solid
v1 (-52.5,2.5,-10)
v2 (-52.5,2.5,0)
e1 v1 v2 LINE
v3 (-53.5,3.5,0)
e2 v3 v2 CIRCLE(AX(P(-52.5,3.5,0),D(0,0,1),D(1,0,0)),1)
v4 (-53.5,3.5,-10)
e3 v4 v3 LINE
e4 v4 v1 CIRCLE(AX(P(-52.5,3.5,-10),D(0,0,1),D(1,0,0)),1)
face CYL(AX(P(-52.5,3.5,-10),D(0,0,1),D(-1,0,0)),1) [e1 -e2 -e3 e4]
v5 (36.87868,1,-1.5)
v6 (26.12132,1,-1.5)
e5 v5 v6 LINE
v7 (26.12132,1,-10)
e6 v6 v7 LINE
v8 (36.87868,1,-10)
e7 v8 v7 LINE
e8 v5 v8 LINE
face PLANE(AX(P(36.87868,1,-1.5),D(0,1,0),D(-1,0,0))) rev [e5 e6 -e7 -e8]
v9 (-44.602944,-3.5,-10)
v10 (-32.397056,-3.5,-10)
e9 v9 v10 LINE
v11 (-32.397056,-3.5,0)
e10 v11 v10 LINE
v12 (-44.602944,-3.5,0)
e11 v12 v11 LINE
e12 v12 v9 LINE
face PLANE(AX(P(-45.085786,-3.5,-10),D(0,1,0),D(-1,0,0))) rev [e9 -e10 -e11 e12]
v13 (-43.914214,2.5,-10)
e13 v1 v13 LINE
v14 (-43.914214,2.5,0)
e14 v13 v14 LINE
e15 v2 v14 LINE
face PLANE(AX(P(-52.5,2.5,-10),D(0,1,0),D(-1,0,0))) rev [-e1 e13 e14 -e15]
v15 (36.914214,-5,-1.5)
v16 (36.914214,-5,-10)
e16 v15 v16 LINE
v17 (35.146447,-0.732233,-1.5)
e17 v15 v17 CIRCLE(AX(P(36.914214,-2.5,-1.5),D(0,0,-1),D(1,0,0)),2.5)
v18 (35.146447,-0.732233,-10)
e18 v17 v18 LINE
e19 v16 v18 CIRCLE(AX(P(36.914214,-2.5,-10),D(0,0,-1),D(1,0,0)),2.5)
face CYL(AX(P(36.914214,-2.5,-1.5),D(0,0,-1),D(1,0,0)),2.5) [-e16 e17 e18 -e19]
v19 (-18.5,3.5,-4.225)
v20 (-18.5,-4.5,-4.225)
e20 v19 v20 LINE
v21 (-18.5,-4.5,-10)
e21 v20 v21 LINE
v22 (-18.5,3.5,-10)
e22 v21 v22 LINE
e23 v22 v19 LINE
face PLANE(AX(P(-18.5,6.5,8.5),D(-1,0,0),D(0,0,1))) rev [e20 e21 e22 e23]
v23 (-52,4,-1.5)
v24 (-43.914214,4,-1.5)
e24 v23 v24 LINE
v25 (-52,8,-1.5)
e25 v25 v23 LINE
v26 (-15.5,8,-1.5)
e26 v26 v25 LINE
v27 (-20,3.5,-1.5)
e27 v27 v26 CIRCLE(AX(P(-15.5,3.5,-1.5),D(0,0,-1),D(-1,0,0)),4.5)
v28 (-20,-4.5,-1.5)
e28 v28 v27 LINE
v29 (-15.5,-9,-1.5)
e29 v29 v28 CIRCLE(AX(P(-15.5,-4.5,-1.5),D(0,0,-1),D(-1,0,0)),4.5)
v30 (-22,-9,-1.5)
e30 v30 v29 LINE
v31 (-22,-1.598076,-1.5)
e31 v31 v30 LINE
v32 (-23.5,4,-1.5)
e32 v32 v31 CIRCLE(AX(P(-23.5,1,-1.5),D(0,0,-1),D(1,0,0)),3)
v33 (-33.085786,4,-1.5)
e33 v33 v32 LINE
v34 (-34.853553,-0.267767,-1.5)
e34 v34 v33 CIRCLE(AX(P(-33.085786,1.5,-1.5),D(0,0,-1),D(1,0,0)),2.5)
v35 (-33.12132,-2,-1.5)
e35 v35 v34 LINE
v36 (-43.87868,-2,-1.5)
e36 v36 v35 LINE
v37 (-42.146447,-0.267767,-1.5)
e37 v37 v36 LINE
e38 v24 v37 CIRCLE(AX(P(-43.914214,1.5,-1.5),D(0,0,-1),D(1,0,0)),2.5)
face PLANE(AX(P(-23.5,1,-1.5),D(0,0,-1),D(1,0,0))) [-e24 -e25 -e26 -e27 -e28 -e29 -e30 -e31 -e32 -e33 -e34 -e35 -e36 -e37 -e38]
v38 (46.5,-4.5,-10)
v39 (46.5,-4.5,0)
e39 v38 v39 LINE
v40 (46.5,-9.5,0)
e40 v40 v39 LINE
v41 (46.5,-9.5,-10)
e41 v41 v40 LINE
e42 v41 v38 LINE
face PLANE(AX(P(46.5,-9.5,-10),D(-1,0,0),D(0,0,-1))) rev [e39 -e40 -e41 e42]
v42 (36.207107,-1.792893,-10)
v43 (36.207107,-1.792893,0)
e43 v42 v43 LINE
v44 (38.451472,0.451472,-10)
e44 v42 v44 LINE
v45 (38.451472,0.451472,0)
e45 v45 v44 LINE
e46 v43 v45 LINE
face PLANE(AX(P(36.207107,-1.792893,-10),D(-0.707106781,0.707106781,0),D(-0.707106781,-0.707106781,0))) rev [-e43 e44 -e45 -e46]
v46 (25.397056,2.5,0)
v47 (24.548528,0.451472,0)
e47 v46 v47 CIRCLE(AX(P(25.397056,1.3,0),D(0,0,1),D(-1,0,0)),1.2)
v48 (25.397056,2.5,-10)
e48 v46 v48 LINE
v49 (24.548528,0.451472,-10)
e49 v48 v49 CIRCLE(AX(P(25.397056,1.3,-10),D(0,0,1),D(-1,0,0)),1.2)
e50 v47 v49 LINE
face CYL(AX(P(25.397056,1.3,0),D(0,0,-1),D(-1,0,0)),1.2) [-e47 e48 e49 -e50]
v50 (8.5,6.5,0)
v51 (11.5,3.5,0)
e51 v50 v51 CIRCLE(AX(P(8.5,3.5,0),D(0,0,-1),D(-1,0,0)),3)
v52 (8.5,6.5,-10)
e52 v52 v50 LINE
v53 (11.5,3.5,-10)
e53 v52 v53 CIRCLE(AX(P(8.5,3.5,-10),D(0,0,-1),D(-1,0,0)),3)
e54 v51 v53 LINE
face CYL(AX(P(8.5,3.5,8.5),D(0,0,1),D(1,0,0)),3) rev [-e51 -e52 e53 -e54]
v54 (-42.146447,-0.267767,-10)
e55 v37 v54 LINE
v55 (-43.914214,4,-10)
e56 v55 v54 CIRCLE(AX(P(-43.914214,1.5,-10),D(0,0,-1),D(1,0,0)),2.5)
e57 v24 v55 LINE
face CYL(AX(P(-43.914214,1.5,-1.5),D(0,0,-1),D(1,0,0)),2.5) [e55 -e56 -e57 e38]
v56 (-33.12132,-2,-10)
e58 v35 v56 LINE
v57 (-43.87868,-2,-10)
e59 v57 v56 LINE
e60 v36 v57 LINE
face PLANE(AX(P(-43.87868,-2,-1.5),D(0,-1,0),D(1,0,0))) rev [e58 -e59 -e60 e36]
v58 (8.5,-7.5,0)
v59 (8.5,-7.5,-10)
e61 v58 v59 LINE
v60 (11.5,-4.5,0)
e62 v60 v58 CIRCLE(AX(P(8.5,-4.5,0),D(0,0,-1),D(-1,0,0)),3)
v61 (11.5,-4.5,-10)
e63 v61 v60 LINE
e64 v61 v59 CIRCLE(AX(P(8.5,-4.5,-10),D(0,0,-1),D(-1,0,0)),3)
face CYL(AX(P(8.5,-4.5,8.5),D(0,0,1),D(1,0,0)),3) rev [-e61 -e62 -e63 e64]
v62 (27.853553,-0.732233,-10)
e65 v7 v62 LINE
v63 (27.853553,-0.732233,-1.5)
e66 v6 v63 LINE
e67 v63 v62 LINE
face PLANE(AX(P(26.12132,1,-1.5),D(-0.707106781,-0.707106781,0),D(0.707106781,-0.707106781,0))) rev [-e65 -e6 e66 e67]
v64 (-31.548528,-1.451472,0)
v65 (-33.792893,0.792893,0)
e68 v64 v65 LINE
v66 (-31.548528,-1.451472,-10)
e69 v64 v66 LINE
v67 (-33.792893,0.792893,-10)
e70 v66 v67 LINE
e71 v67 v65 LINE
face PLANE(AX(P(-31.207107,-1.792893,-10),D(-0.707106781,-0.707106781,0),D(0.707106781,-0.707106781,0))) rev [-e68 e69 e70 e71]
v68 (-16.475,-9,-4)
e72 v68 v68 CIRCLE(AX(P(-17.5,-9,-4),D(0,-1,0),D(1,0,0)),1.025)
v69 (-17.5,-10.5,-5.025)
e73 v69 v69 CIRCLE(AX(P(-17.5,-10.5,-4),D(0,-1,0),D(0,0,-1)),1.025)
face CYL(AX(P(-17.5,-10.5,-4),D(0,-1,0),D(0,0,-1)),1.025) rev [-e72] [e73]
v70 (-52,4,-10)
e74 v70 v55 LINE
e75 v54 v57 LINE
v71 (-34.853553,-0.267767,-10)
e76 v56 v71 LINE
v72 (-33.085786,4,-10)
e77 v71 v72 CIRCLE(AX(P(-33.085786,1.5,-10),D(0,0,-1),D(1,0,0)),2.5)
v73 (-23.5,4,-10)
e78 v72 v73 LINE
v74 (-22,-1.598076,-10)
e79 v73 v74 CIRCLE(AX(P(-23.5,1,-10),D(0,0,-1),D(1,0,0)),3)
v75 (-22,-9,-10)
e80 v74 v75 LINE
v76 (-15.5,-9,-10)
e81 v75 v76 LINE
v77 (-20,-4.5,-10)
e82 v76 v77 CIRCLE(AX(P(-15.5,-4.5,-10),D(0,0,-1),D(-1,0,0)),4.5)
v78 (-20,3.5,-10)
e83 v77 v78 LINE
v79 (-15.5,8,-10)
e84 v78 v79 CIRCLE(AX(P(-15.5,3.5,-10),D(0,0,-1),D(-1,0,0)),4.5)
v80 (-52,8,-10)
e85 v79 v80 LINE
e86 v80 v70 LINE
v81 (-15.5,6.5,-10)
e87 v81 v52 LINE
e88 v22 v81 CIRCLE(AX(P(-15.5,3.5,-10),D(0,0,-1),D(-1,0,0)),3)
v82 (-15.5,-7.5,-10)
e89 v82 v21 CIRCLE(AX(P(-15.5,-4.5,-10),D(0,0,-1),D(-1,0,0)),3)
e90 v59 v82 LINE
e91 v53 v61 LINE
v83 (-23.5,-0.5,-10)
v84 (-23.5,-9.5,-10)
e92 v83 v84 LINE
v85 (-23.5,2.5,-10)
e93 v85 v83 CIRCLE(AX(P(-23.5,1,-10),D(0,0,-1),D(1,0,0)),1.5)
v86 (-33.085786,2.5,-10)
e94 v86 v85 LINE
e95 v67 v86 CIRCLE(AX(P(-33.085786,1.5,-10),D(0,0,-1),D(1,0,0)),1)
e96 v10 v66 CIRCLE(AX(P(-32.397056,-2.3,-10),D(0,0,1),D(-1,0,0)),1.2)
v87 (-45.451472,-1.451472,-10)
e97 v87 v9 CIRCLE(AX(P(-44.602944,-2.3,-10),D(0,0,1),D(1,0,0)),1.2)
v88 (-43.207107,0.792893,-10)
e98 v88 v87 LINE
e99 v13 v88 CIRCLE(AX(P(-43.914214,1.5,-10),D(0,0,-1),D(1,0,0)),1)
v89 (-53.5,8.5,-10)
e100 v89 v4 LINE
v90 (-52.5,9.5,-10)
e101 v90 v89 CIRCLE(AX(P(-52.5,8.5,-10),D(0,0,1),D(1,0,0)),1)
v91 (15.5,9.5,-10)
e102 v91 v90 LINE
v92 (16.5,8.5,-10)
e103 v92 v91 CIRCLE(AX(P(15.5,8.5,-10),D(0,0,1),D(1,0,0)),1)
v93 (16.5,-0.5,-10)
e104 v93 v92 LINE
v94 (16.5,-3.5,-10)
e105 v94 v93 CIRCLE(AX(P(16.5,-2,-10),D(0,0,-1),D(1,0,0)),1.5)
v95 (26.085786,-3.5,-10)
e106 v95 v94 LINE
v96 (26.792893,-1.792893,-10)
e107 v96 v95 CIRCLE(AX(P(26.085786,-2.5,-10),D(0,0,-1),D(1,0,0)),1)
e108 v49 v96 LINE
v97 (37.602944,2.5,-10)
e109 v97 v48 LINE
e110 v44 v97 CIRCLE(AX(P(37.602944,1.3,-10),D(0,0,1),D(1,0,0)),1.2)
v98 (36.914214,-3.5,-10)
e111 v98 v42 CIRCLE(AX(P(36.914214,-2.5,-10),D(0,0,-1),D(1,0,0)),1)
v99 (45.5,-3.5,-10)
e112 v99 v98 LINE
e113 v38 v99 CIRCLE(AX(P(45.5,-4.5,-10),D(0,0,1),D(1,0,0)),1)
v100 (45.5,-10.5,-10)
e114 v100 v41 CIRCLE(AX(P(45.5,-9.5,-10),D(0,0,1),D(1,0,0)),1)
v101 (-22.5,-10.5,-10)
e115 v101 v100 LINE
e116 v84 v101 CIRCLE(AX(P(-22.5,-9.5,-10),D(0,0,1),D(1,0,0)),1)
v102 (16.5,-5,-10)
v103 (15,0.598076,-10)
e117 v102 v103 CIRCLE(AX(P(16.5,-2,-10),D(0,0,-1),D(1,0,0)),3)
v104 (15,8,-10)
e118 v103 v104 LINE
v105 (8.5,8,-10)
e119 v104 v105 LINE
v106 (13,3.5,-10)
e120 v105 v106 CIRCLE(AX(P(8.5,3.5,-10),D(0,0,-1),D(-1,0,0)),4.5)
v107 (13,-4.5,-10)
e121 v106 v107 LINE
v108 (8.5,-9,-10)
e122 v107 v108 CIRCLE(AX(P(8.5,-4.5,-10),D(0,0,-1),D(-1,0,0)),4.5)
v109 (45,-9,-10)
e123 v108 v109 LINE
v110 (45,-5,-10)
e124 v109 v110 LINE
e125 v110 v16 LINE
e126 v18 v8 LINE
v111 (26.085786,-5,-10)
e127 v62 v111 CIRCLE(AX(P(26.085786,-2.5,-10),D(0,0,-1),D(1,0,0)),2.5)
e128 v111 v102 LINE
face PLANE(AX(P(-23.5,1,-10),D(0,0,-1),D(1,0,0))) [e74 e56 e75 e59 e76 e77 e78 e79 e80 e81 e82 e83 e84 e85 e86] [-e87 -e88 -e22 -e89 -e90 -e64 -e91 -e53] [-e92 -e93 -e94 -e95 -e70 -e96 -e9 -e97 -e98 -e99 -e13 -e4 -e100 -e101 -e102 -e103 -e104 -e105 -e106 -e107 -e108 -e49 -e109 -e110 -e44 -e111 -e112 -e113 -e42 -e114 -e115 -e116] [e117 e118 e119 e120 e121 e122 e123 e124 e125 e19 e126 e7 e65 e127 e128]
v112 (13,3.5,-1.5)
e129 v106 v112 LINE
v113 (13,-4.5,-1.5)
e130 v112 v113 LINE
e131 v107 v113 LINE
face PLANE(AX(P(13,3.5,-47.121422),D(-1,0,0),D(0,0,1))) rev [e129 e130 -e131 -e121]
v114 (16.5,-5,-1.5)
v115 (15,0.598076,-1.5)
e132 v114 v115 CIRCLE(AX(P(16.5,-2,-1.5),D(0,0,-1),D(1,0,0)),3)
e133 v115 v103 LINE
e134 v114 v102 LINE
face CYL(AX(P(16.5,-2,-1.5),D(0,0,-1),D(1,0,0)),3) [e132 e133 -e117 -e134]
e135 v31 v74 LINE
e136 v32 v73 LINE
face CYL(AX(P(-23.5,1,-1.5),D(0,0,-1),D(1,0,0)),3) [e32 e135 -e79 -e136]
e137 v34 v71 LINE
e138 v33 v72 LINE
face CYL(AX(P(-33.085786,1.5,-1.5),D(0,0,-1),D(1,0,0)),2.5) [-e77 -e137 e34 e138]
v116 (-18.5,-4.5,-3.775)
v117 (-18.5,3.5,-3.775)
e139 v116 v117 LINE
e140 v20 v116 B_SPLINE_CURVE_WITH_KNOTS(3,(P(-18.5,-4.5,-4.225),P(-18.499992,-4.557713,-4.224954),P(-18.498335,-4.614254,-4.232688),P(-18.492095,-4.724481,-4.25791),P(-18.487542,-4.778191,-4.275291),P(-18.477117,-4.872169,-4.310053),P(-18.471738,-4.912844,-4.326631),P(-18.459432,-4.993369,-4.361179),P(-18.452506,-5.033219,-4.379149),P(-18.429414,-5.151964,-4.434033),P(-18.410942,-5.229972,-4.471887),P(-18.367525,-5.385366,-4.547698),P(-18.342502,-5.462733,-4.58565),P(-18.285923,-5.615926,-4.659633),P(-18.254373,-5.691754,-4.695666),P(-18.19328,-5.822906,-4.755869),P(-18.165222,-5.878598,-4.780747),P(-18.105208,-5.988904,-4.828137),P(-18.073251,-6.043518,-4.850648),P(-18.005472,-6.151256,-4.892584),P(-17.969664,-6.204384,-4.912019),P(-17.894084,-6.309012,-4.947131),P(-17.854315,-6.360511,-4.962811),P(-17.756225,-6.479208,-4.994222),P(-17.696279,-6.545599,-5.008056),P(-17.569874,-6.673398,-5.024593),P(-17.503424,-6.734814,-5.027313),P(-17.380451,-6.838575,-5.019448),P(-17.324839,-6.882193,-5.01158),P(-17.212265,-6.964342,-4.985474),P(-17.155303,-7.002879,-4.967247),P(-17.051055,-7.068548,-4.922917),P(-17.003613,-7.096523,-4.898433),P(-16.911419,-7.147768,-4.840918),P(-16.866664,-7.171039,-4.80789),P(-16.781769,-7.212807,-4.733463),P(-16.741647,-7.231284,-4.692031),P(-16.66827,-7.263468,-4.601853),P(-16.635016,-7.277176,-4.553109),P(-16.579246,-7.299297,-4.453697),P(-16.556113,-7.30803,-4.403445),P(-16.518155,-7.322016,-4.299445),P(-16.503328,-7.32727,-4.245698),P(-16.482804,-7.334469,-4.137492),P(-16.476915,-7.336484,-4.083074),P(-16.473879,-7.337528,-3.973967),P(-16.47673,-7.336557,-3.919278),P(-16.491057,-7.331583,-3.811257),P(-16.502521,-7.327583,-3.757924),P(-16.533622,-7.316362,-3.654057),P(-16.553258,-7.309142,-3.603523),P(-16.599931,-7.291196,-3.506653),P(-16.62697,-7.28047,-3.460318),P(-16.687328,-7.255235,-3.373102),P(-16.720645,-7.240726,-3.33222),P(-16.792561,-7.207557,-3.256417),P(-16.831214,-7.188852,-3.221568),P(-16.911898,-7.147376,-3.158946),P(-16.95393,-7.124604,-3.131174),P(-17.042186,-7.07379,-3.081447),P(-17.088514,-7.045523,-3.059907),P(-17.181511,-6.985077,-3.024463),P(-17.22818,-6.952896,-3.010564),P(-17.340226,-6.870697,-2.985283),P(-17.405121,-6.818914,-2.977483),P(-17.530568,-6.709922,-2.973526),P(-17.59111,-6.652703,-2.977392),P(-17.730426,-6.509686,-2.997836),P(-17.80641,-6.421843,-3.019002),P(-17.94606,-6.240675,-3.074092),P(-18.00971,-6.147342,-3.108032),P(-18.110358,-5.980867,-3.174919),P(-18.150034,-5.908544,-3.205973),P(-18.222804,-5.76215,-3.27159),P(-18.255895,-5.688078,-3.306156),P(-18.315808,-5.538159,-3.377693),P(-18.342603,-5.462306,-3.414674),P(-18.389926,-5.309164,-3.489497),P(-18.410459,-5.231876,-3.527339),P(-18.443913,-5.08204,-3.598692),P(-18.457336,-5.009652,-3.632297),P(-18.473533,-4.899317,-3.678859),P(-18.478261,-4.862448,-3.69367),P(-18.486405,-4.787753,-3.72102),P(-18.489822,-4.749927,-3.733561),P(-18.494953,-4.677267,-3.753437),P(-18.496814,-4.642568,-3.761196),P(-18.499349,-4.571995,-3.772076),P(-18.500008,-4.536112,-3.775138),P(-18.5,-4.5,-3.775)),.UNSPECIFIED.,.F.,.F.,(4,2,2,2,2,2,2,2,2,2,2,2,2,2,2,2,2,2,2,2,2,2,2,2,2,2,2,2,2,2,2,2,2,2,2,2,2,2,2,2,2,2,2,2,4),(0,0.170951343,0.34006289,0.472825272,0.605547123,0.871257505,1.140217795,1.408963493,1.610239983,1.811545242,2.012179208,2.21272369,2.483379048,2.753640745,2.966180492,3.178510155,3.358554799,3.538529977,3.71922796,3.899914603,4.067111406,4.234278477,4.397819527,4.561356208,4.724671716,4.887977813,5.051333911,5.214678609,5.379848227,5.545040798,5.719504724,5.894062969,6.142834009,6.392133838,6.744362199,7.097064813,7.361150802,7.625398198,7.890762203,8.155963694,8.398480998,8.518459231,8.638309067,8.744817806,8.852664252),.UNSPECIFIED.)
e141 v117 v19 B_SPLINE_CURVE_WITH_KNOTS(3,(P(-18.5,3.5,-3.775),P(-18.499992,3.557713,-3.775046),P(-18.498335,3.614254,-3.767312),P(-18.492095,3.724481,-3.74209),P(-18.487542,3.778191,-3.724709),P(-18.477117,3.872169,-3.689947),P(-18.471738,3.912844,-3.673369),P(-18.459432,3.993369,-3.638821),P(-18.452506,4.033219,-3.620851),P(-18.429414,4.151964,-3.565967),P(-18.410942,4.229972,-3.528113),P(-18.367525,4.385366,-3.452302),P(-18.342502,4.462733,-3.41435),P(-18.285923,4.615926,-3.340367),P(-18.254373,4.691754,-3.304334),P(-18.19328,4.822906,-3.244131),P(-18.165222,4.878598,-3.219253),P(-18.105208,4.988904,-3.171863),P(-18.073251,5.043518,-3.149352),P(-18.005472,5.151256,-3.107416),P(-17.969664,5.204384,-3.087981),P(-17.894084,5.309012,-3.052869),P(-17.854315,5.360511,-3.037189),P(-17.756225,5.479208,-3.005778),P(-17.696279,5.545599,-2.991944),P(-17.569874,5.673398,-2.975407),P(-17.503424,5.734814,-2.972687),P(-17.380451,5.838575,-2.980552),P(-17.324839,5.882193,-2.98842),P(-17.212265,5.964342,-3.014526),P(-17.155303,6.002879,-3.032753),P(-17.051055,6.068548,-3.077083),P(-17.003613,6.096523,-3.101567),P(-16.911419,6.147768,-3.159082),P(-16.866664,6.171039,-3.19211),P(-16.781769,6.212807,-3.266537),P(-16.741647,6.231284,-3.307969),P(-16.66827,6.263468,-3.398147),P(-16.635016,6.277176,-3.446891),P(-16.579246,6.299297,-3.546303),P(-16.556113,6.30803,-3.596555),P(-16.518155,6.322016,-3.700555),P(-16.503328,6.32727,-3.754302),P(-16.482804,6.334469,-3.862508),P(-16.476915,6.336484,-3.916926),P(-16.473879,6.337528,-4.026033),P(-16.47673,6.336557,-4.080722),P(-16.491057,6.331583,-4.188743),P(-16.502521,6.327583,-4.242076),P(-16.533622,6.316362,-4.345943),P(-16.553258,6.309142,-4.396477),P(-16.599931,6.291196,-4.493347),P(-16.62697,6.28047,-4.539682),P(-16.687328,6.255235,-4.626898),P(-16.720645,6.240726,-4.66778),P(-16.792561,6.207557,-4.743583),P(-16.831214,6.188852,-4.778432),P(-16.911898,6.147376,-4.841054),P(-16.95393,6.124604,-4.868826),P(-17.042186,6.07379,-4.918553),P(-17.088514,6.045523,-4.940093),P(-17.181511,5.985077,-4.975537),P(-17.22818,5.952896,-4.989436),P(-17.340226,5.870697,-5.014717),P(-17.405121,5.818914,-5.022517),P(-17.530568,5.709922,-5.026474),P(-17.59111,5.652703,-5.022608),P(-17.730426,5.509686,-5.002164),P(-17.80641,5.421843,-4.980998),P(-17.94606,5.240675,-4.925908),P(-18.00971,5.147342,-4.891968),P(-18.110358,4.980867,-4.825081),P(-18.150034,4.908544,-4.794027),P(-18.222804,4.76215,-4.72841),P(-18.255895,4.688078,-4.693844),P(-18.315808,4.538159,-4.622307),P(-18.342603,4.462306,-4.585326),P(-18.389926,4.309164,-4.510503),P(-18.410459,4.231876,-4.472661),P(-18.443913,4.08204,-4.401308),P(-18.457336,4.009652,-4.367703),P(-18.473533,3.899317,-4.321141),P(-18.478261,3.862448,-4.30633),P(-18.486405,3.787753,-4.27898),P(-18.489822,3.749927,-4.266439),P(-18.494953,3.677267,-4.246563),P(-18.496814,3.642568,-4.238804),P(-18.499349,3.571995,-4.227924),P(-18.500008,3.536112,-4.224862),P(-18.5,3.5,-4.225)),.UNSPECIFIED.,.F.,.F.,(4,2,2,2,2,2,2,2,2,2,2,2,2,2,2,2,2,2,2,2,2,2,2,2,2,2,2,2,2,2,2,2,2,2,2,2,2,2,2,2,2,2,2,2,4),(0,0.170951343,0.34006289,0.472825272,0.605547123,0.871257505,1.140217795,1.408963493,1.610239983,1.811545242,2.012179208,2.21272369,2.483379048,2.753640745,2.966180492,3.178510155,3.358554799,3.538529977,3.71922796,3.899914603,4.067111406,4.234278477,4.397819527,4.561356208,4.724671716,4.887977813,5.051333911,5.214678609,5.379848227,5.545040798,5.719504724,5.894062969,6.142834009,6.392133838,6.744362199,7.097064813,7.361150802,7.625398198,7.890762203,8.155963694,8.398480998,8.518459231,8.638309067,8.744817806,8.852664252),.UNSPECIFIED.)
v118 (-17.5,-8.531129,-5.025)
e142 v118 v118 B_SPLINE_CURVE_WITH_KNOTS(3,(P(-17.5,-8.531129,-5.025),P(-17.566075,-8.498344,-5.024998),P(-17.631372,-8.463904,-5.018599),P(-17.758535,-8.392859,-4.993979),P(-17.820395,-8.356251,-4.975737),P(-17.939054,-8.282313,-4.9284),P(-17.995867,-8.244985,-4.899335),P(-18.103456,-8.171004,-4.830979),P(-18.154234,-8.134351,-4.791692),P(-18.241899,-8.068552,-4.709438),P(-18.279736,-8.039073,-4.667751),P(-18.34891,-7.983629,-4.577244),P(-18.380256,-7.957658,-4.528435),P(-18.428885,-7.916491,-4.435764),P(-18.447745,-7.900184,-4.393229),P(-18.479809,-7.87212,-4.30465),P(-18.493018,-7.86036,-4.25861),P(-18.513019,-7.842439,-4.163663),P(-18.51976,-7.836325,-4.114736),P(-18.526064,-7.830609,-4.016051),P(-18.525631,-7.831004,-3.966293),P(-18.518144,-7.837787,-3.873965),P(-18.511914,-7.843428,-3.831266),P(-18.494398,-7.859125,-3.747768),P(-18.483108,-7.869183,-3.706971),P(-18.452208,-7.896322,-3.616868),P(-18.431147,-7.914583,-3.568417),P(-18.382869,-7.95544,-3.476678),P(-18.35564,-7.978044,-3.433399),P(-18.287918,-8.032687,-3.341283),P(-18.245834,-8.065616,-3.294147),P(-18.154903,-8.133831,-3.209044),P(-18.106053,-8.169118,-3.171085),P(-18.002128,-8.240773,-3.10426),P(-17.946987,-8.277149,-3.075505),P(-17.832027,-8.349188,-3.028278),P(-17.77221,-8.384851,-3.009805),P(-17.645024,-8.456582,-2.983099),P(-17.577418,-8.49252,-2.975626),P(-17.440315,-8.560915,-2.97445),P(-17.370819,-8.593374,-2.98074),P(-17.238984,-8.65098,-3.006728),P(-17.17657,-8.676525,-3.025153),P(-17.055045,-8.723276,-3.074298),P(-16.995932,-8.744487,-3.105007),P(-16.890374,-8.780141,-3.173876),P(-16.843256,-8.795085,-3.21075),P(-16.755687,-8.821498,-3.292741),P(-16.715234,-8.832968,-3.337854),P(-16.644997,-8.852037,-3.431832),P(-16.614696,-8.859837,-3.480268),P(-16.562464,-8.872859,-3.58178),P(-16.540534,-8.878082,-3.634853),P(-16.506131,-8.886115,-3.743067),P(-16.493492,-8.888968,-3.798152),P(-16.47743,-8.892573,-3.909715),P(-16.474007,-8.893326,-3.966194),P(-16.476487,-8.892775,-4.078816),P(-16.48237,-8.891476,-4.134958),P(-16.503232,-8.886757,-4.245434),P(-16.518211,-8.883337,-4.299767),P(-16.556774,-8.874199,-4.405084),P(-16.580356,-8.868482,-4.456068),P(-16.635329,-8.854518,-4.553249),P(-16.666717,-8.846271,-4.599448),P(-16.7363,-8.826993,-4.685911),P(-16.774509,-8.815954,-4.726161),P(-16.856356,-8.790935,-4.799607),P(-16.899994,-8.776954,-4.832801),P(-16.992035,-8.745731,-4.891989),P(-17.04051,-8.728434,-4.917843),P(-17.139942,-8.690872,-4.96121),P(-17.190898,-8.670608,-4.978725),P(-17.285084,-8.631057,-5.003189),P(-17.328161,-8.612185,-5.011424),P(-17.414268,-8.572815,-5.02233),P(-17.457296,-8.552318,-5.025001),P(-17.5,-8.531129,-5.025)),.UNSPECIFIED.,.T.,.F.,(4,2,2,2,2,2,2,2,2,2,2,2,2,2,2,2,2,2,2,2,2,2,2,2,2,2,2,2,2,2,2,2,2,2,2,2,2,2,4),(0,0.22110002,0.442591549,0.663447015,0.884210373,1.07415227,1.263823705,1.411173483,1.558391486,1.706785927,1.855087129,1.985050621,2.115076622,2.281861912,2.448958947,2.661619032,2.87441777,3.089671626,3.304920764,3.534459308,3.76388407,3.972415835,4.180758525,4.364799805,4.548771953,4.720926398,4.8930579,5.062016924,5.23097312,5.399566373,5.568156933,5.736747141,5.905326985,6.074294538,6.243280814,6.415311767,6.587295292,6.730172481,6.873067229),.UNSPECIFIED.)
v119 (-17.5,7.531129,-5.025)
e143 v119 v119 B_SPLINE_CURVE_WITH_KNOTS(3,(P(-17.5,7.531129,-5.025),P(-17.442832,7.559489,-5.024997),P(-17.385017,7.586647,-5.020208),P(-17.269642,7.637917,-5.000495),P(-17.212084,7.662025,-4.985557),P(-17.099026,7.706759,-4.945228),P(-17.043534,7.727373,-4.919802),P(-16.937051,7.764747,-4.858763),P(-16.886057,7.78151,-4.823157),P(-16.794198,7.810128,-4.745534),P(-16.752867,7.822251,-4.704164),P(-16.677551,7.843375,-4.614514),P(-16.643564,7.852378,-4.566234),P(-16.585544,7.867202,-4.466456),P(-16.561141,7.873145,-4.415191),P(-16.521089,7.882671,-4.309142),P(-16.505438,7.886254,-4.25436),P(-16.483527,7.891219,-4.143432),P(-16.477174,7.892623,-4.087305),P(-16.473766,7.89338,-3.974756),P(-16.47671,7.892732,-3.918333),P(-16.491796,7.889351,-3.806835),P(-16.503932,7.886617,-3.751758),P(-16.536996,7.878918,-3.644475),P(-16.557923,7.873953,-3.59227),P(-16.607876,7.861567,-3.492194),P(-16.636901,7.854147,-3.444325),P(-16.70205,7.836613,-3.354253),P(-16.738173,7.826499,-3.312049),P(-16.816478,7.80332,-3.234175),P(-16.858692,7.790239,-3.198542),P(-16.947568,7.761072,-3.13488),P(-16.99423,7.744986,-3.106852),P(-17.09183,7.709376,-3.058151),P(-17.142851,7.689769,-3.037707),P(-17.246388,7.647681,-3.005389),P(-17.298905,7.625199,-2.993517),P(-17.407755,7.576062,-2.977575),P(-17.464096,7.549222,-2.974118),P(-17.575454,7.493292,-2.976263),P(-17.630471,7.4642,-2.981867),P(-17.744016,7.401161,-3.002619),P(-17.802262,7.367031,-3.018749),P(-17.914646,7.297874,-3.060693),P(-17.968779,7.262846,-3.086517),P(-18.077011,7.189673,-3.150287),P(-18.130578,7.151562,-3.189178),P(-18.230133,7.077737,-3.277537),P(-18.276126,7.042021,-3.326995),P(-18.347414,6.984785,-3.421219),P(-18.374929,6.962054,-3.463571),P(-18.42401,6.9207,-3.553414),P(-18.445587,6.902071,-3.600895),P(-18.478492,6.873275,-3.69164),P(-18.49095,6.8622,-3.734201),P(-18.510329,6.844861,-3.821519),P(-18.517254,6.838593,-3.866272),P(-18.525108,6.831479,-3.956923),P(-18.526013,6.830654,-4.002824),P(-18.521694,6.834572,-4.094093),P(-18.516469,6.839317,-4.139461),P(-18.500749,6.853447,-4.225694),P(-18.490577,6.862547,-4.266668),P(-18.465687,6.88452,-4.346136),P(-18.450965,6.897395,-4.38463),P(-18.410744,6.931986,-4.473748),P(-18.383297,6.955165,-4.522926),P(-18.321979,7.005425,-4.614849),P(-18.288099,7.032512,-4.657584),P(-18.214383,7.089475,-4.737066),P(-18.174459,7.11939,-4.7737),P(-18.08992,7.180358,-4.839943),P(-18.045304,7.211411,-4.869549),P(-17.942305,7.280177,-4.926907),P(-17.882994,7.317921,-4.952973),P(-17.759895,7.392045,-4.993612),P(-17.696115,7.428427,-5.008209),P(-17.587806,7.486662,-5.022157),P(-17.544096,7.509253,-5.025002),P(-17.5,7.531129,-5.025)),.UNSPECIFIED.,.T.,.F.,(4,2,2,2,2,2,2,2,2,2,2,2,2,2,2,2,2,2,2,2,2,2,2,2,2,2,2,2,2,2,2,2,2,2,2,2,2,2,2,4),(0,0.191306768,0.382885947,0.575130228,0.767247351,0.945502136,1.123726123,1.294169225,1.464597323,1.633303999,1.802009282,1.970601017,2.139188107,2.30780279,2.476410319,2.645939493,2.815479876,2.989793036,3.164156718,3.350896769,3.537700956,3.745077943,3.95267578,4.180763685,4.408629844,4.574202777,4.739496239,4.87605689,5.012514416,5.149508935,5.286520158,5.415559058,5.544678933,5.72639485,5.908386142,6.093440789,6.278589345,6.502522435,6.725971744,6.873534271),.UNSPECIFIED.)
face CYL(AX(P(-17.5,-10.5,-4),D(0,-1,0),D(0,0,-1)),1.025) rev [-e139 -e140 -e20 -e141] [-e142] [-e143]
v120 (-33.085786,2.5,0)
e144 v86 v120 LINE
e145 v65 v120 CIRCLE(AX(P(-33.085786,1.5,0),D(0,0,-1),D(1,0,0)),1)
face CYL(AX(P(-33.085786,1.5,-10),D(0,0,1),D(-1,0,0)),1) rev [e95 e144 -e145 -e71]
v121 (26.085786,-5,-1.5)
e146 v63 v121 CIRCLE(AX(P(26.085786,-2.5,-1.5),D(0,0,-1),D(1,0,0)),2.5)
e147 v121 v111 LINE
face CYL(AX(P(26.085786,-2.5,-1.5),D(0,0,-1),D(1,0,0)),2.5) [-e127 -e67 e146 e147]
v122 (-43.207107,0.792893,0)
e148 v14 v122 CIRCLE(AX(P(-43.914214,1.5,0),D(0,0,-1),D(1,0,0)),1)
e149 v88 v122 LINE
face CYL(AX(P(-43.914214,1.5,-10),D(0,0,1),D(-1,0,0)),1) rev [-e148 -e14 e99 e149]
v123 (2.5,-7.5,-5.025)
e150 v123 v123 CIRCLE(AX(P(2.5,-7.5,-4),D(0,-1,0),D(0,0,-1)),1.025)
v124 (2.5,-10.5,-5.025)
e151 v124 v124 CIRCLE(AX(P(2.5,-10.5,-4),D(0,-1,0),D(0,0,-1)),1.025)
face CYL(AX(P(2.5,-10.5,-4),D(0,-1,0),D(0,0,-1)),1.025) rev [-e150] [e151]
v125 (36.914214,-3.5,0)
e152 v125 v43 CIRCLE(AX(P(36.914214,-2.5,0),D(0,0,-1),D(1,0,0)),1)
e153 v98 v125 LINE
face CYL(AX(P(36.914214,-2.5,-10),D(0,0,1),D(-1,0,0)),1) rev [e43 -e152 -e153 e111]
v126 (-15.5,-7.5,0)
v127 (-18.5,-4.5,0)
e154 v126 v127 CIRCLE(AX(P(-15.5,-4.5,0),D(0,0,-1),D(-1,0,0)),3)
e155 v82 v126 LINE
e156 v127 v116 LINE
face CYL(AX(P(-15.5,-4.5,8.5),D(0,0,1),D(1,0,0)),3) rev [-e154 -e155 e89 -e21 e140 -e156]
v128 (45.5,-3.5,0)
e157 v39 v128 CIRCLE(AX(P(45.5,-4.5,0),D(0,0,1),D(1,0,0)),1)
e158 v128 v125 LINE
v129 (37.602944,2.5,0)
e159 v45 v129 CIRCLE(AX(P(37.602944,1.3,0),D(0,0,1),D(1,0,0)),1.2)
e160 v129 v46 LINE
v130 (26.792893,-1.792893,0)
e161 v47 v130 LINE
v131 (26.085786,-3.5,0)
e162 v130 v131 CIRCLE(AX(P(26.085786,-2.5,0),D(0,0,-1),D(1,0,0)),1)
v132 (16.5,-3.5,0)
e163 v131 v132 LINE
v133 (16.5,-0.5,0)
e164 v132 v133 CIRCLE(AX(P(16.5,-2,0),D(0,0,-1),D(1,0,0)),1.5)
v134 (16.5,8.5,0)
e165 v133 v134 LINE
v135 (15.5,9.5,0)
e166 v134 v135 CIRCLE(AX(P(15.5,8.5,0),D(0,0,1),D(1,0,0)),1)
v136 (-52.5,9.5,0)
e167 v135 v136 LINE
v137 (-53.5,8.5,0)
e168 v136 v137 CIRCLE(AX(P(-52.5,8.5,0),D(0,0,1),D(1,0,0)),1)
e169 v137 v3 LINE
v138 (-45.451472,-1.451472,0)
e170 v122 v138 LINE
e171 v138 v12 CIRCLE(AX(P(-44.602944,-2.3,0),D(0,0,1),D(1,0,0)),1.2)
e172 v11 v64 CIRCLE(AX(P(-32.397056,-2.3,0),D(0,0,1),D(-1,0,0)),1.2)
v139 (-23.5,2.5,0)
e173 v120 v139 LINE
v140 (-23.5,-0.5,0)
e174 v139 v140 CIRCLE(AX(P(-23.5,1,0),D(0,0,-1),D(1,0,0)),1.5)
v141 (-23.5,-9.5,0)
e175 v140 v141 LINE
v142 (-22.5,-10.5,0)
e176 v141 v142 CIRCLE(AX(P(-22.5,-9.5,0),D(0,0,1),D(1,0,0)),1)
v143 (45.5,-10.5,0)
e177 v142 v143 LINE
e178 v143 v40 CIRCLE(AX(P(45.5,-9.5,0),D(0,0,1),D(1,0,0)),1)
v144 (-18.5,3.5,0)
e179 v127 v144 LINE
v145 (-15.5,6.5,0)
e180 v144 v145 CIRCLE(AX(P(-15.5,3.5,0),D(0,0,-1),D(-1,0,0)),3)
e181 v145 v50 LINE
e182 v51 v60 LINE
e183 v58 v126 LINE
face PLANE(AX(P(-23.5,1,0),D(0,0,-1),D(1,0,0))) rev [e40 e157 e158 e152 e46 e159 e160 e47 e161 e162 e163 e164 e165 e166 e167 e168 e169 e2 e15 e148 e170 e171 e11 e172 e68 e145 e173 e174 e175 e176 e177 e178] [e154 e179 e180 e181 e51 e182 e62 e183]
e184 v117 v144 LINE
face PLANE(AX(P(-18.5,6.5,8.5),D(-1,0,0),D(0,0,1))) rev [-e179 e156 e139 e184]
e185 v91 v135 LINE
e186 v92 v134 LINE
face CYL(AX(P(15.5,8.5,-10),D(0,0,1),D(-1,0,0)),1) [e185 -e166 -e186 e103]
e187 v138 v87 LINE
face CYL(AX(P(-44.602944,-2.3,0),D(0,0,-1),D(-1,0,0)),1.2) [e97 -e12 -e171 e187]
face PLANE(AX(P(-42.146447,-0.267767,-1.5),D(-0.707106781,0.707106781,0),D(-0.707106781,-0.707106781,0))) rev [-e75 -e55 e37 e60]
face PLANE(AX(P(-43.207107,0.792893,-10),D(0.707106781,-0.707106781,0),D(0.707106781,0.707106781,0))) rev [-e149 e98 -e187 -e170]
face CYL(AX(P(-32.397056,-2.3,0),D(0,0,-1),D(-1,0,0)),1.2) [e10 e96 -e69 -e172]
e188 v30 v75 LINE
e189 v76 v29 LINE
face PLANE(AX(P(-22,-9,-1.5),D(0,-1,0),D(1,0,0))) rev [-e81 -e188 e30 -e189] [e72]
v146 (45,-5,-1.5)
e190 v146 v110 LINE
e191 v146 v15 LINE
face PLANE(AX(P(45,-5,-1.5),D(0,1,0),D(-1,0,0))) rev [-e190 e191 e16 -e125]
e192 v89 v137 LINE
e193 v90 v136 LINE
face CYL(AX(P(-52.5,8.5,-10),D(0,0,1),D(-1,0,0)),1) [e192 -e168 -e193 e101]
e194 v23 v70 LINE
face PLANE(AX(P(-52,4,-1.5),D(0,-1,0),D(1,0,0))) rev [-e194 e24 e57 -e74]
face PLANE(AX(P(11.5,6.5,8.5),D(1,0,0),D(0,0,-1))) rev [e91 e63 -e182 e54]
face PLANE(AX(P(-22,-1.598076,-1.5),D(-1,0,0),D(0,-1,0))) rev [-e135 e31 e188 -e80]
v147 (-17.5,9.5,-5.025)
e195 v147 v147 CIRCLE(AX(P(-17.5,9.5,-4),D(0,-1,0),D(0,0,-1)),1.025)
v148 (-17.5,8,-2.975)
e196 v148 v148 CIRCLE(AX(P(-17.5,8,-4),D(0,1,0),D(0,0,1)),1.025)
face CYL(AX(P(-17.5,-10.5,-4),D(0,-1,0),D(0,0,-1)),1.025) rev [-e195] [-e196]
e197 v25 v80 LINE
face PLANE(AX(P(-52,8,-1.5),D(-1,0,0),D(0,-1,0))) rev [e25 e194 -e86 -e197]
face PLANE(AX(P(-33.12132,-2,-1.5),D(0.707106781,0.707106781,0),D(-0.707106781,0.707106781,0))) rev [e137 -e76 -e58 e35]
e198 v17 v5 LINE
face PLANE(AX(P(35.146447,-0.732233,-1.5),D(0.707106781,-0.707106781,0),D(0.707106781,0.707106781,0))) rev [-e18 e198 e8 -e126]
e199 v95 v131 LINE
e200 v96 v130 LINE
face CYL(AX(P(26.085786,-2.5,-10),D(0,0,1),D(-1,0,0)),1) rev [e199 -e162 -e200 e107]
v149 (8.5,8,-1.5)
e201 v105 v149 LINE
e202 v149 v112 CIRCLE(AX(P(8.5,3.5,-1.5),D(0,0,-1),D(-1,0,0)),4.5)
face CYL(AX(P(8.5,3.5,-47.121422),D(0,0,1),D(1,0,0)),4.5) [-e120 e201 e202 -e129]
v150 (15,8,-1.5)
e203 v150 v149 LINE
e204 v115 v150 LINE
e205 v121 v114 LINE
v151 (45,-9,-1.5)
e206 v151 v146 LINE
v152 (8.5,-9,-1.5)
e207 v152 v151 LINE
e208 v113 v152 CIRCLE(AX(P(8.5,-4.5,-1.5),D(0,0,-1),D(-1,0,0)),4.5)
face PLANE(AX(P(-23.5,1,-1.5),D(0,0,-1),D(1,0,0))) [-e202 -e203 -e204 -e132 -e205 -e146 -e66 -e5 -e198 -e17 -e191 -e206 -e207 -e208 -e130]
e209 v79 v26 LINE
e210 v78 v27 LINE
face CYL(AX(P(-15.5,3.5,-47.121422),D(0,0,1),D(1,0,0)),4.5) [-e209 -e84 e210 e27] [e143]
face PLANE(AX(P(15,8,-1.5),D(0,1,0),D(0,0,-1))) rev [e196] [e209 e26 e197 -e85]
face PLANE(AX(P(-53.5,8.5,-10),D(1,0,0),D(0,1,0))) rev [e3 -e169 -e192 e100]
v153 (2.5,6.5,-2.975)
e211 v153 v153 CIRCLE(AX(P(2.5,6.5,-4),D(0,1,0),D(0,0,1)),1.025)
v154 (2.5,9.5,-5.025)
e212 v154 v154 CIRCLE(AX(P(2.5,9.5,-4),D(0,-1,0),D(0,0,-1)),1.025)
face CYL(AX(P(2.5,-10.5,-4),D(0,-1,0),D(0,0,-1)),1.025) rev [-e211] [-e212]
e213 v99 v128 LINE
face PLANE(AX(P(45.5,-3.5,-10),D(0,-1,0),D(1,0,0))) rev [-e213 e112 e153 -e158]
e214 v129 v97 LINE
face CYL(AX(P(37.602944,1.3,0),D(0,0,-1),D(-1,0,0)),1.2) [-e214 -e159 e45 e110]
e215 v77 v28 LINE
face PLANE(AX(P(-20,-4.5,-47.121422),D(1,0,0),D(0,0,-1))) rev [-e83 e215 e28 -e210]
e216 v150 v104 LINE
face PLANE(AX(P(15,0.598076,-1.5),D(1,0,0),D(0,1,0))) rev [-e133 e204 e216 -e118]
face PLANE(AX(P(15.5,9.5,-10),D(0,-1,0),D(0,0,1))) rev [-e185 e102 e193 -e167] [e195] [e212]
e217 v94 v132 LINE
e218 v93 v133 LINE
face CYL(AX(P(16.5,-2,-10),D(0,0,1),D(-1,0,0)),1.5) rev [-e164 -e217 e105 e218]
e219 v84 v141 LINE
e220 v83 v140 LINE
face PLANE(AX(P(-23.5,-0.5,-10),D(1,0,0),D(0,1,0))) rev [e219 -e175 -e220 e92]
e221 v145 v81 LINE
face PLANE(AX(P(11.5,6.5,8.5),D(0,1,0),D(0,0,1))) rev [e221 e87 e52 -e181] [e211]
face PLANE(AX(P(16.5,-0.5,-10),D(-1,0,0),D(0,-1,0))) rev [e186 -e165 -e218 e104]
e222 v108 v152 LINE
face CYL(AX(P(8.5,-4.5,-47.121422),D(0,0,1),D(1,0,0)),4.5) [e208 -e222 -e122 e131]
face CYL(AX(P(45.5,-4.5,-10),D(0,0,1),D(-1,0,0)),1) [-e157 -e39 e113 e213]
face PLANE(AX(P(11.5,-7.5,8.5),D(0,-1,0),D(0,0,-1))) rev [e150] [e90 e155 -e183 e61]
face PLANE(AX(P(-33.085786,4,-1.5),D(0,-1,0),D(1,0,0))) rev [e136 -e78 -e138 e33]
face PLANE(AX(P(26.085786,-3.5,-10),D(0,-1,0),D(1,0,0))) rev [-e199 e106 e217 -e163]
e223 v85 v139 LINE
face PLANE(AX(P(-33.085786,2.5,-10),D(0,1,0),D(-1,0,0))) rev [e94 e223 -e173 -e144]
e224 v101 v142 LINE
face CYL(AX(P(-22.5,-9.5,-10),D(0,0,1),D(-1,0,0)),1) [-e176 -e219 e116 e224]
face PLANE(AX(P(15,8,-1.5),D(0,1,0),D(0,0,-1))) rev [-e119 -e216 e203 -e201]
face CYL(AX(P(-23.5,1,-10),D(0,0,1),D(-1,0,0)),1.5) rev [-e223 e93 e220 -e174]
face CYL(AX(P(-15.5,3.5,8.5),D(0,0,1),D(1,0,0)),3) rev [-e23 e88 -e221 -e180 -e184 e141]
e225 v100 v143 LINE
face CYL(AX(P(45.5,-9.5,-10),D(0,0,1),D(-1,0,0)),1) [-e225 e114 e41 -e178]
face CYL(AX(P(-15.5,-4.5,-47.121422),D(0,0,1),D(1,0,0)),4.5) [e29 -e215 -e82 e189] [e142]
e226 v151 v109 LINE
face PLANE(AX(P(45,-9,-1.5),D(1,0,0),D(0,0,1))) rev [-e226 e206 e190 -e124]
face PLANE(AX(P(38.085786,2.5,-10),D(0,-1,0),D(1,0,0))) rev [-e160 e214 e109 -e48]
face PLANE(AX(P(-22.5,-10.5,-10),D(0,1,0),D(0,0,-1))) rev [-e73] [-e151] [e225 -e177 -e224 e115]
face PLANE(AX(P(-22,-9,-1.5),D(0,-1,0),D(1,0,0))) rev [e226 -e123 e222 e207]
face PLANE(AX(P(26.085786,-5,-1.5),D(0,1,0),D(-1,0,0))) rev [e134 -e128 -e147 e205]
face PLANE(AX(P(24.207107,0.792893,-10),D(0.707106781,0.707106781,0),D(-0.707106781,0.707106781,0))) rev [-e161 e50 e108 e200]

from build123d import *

# Parameters (mm, degrees)
ABS_ZWING_MIRRORED_START      = -10
ABS_ZWING_MIRRORED_DEPTH      = 10
ABS_ZWING_MIRRORED_START_2    = -1.5
ABS_ZWING_MIRRORED_2_DEPTH    = 1.5
SKETCH1_W                     = 30
SKETCH1_H                     = 14
CUT_EXTRUDE1_DEPTH            = 10
FILLET1_R                     = 3
BOSS_EXTRUDE2_DEPTH           = 8.5
CUT_EXTRUDE2_DEPTH            = 10
TAP_DRILL_FOR_M2_5_TAP1_D     = 2.05
TAP_DRILL_FOR_M2_5_TAP1_DEPTH = 30.5


# Read off the part's stored shape, not the designer's step: abs_zwing_Mirrored
with BuildPart() as part:
    # abs_zwing_Mirrored outline → abs_zwing_Mirrored (new body)
    with BuildSketch(Plane.XY.offset(ABS_ZWING_MIRRORED_START)):
        with BuildLine():
            ThreePointArc((-23.5, 2.5), (-22, 1), (-23.5, -0.5))
            Line((-23.5, -0.5), (-23.5, -9.5))
            ThreePointArc((-23.5, -9.5), (-23.207106781, -10.207106781), (-22.5, -10.5))
            Line((-22.5, -10.5), (45.5, -10.5))
            ThreePointArc((45.5, -10.5), (46.207106781, -10.207106781), (46.5, -9.5))
            Line((46.5, -9.5), (46.5, -4.5))
            ThreePointArc((46.5, -4.5), (46.207106781, -3.792893219), (45.5, -3.5))
            Line((45.5, -3.5), (36.914213562, -3.5))
            ThreePointArc((36.914213562, -3.5), (35.99033403, -2.882683432), (36.207106781, -1.792893219))
            Line((36.207106781, -1.792893219), (38.792893219, 0.792893219))
            ThreePointArc((38.792893219, 0.792893219), (39.00966597, 1.882683432), (38.085786438, 2.5))
            Line((38.085786438, 2.5), (24.914213562, 2.5))
            ThreePointArc((24.914213562, 2.5), (23.99033403, 1.882683432), (24.207106781, 0.792893219))
            Line((24.207106781, 0.792893219), (26.792893219, -1.792893219))
            ThreePointArc((26.792893219, -1.792893219), (27.00966597, -2.882683432), (26.085786438, -3.5))
            Line((26.085786438, -3.5), (16.5, -3.5))
            ThreePointArc((16.5, -3.5), (15, -2), (16.5, -0.5))
            Line((16.5, -0.5), (16.5, 8.5))
            ThreePointArc((16.5, 8.5), (16.207106781, 9.207106781), (15.5, 9.5))
            Line((15.5, 9.5), (-52.5, 9.5))
            ThreePointArc((-52.5, 9.5), (-53.207106781, 9.207106781), (-53.5, 8.5))
            Line((-53.5, 8.5), (-53.5, 3.5))
            ThreePointArc((-53.5, 3.5), (-53.207106781, 2.792893219), (-52.5, 2.5))
            Line((-52.5, 2.5), (-43.914213562, 2.5))
            ThreePointArc((-43.914213562, 2.5), (-42.99033403, 1.882683432), (-43.207106781, 0.792893219))
            Line((-43.207106781, 0.792893219), (-45.792893219, -1.792893219))
            ThreePointArc((-45.792893219, -1.792893219), (-46.00966597, -2.882683432), (-45.085786438, -3.5))
            Line((-45.085786438, -3.5), (-31.914213562, -3.5))
            ThreePointArc((-31.914213562, -3.5), (-30.99033403, -2.882683432), (-31.207106781, -1.792893219))
            Line((-31.207106781, -1.792893219), (-33.792893219, 0.792893219))
            ThreePointArc((-33.792893219, 0.792893219), (-34.00966597, 1.882683432), (-33.085786438, 2.5))
            Line((-33.085786438, 2.5), (-23.5, 2.5))
        make_face()
        with BuildLine():
            ThreePointArc((-22, -1.598076211), (-20.602222521, 1.776457136), (-23.5, 4))
            Line((-23.5, 4), (-33.085786438, 4))
            ThreePointArc((-33.085786438, 4), (-35.395485269, 2.456708581), (-34.853553391, -0.267766953))
            Line((-34.853553391, -0.267766953), (-33.121320344, -2))
            Line((-33.121320344, -2), (-43.878679656, -2))
            Line((-43.878679656, -2), (-42.146446609, -0.267766953))
            ThreePointArc((-42.146446609, -0.267766953), (-41.604514731, 2.456708581), (-43.914213562, 4))
            Line((-43.914213562, 4), (-52, 4))
            Line((-52, 4), (-52, 8))
            Line((-52, 8), (15, 8))
            Line((15, 8), (15, 0.598076211))
            ThreePointArc((15, 0.598076211), (13.602222521, -2.776457136), (16.5, -5))
            Line((16.5, -5), (26.085786438, -5))
            ThreePointArc((26.085786438, -5), (28.395485269, -3.456708581), (27.853553391, -0.732233047))
            Line((27.853553391, -0.732233047), (26.121320344, 1))
            Line((26.121320344, 1), (36.878679656, 1))
            Line((36.878679656, 1), (35.146446609, -0.732233047))
            ThreePointArc((35.146446609, -0.732233047), (34.604514731, -3.456708581), (36.914213562, -5))
            Line((36.914213562, -5), (45, -5))
            Line((45, -5), (45, -9))
            Line((45, -9), (-22, -9))
            Line((-22, -9), (-22, -1.598076211))
        make_face(mode=Mode.SUBTRACT)
    extrude(amount=ABS_ZWING_MIRRORED_DEPTH)

    # abs_zwing_Mirrored 2 outline → abs_zwing_Mirrored 2 (add)
    with BuildSketch(Plane.XY.offset(ABS_ZWING_MIRRORED_START_2)):
        with BuildLine():
            Line((-33.085786438, 4), (-23.5, 4))
            ThreePointArc((-23.5, 4), (-20.602222521, 1.776457136), (-22, -1.598076211))
            Line((-22, -1.598076211), (-22, -9))
            Line((-22, -9), (45, -9))
            Line((45, -9), (45, -5))
            Line((45, -5), (36.914213562, -5))
            ThreePointArc((36.914213562, -5), (34.604514731, -3.456708581), (35.146446609, -0.732233047))
            Line((35.146446609, -0.732233047), (36.878679656, 1))
            Line((36.878679656, 1), (26.121320344, 1))
            Line((26.121320344, 1), (27.853553391, -0.732233047))
            ThreePointArc((27.853553391, -0.732233047), (28.395485269, -3.456708581), (26.085786438, -5))
            Line((26.085786438, -5), (16.5, -5))
            ThreePointArc((16.5, -5), (13.602222521, -2.776457136), (15, 0.598076211))
            Line((15, 0.598076211), (15, 8))
            Line((15, 8), (-52, 8))
            Line((-52, 8), (-52, 4))
            Line((-52, 4), (-43.914213562, 4))
            ThreePointArc((-43.914213562, 4), (-41.604514731, 2.456708581), (-42.146446609, -0.267766953))
            Line((-42.146446609, -0.267766953), (-43.878679656, -2))
            Line((-43.878679656, -2), (-33.121320344, -2))
            Line((-33.121320344, -2), (-34.853553391, -0.267766953))
            ThreePointArc((-34.853553391, -0.267766953), (-35.395485269, 2.456708581), (-33.085786438, 4))
        make_face()
    extrude(amount=ABS_ZWING_MIRRORED_2_DEPTH)

    # Sketch1 → Cut-Extrude1 (cut)
    with BuildSketch(Plane(origin=(0, 0, -1.5), x_dir=(-1, 0, 0), z_dir=(0, 0, -1))):
        with Locations((3.5, -0.5)):
            Rectangle(SKETCH1_W, SKETCH1_H)
    extrude(amount=-CUT_EXTRUDE1_DEPTH, mode=Mode.SUBTRACT)

    # Fillet1
    fillet1_edges = [part.edges().sort_by_distance(p)[0] for p in [
        (11.5, -7.5, -0.75),
        (11.5, 6.5, -0.75),
        (-18.5, 6.5, -0.75),
        (-18.5, -7.5, -0.75),
    ]]
    fillet(fillet1_edges, radius=FILLET1_R)

    # Sketch4 → Boss-Extrude2 (add)
    with BuildSketch(Plane(origin=(0, 0, -1.5), x_dir=(-1, 0, 0), z_dir=(0, 0, -1))):
        with BuildLine():
            Line((-13, 3.5), (-13, -4.5))
            ThreePointArc((-13, -4.5), (-11.681980515, -7.681980515), (-8.5, -9))
            Line((-8.5, -9), (15.5, -9))
            ThreePointArc((15.5, -9), (18.681980515, -7.681980515), (20, -4.5))
            Line((20, -4.5), (20, 3.5))
            ThreePointArc((20, 3.5), (18.681980515, 6.681980515), (15.5, 8))
            Line((15.5, 8), (-8.5, 8))
            ThreePointArc((-8.5, 8), (-11.681980515, 6.681980515), (-13, 3.5))
        make_face()
        with BuildLine():
            Line((-11.5, 3.5), (-11.5, -4.5))
            ThreePointArc((-11.5, -4.5), (-10.621320344, -6.621320344), (-8.5, -7.5))
            Line((-8.5, -7.5), (15.5, -7.5))
            ThreePointArc((15.5, -7.5), (17.621320344, -6.621320344), (18.5, -4.5))
            Line((18.5, -4.5), (18.5, 3.5))
            ThreePointArc((18.5, 3.5), (17.621320344, 5.621320344), (15.5, 6.5))
            Line((15.5, 6.5), (-8.5, 6.5))
            ThreePointArc((-8.5, 6.5), (-10.621320344, 5.621320344), (-11.5, 3.5))
        make_face(mode=Mode.SUBTRACT)
    extrude(amount=BOSS_EXTRUDE2_DEPTH)

    # Sketch8 → Cut-Extrude2 (cut)
    with BuildSketch(Plane(origin=(0, 0, -10), x_dir=(-1, 0, 0), z_dir=(0, 0, -1))):
        with BuildLine():
            Line((-38.451471863, 0.451471863), (-40.5, 2.5))
            Line((-40.5, 2.5), (-37.602943725, 2.5))
            ThreePointArc((-37.602943725, 2.5), (-38.711599164, 1.759220119), (-38.451471863, 0.451471863))
        make_face()
        with BuildLine():
            Line((-25.397056275, 2.5), (-22.5, 2.5))
            Line((-22.5, 2.5), (-24.548528137, 0.451471863))
            ThreePointArc((-24.548528137, 0.451471863), (-24.288400836, 1.759220119), (-25.397056275, 2.5))
        make_face()
        with BuildLine():
            Line((33, 0), (31.548528137, -1.451471863))
            ThreePointArc((31.548528137, -1.451471863), (31.288400836, -2.759220119), (32.397056275, -3.5))
            Line((32.397056275, -3.5), (44.602943725, -3.5))
            ThreePointArc((44.602943725, -3.5), (45.711599164, -2.759220119), (45.451471863, -1.451471863))
            Line((45.451471863, -1.451471863), (44.329289322, -0.329289322))
            Line((44.329289322, -0.329289322), (49.897345602, -0.329289322))
            Line((49.897345602, -0.329289322), (49.897345602, -5.77544861))
            Line((49.897345602, -5.77544861), (28.682020132, -5.77544861))
            Line((28.682020132, -5.77544861), (28.682020132, 0))
            Line((28.682020132, 0), (33, 0))
        make_face()
    extrude(amount=-CUT_EXTRUDE2_DEPTH, mode=Mode.SUBTRACT)

    # Tap Drill for M2.5 Tap1
    with Locations(Plane.XZ.offset(10.5)):
        with Locations((-17.5, -4), (2.5, -4)):
            Hole(TAP_DRILL_FOR_M2_5_TAP1_D / 2, depth=TAP_DRILL_FOR_M2_5_TAP1_DEPTH)


solid = part.part
